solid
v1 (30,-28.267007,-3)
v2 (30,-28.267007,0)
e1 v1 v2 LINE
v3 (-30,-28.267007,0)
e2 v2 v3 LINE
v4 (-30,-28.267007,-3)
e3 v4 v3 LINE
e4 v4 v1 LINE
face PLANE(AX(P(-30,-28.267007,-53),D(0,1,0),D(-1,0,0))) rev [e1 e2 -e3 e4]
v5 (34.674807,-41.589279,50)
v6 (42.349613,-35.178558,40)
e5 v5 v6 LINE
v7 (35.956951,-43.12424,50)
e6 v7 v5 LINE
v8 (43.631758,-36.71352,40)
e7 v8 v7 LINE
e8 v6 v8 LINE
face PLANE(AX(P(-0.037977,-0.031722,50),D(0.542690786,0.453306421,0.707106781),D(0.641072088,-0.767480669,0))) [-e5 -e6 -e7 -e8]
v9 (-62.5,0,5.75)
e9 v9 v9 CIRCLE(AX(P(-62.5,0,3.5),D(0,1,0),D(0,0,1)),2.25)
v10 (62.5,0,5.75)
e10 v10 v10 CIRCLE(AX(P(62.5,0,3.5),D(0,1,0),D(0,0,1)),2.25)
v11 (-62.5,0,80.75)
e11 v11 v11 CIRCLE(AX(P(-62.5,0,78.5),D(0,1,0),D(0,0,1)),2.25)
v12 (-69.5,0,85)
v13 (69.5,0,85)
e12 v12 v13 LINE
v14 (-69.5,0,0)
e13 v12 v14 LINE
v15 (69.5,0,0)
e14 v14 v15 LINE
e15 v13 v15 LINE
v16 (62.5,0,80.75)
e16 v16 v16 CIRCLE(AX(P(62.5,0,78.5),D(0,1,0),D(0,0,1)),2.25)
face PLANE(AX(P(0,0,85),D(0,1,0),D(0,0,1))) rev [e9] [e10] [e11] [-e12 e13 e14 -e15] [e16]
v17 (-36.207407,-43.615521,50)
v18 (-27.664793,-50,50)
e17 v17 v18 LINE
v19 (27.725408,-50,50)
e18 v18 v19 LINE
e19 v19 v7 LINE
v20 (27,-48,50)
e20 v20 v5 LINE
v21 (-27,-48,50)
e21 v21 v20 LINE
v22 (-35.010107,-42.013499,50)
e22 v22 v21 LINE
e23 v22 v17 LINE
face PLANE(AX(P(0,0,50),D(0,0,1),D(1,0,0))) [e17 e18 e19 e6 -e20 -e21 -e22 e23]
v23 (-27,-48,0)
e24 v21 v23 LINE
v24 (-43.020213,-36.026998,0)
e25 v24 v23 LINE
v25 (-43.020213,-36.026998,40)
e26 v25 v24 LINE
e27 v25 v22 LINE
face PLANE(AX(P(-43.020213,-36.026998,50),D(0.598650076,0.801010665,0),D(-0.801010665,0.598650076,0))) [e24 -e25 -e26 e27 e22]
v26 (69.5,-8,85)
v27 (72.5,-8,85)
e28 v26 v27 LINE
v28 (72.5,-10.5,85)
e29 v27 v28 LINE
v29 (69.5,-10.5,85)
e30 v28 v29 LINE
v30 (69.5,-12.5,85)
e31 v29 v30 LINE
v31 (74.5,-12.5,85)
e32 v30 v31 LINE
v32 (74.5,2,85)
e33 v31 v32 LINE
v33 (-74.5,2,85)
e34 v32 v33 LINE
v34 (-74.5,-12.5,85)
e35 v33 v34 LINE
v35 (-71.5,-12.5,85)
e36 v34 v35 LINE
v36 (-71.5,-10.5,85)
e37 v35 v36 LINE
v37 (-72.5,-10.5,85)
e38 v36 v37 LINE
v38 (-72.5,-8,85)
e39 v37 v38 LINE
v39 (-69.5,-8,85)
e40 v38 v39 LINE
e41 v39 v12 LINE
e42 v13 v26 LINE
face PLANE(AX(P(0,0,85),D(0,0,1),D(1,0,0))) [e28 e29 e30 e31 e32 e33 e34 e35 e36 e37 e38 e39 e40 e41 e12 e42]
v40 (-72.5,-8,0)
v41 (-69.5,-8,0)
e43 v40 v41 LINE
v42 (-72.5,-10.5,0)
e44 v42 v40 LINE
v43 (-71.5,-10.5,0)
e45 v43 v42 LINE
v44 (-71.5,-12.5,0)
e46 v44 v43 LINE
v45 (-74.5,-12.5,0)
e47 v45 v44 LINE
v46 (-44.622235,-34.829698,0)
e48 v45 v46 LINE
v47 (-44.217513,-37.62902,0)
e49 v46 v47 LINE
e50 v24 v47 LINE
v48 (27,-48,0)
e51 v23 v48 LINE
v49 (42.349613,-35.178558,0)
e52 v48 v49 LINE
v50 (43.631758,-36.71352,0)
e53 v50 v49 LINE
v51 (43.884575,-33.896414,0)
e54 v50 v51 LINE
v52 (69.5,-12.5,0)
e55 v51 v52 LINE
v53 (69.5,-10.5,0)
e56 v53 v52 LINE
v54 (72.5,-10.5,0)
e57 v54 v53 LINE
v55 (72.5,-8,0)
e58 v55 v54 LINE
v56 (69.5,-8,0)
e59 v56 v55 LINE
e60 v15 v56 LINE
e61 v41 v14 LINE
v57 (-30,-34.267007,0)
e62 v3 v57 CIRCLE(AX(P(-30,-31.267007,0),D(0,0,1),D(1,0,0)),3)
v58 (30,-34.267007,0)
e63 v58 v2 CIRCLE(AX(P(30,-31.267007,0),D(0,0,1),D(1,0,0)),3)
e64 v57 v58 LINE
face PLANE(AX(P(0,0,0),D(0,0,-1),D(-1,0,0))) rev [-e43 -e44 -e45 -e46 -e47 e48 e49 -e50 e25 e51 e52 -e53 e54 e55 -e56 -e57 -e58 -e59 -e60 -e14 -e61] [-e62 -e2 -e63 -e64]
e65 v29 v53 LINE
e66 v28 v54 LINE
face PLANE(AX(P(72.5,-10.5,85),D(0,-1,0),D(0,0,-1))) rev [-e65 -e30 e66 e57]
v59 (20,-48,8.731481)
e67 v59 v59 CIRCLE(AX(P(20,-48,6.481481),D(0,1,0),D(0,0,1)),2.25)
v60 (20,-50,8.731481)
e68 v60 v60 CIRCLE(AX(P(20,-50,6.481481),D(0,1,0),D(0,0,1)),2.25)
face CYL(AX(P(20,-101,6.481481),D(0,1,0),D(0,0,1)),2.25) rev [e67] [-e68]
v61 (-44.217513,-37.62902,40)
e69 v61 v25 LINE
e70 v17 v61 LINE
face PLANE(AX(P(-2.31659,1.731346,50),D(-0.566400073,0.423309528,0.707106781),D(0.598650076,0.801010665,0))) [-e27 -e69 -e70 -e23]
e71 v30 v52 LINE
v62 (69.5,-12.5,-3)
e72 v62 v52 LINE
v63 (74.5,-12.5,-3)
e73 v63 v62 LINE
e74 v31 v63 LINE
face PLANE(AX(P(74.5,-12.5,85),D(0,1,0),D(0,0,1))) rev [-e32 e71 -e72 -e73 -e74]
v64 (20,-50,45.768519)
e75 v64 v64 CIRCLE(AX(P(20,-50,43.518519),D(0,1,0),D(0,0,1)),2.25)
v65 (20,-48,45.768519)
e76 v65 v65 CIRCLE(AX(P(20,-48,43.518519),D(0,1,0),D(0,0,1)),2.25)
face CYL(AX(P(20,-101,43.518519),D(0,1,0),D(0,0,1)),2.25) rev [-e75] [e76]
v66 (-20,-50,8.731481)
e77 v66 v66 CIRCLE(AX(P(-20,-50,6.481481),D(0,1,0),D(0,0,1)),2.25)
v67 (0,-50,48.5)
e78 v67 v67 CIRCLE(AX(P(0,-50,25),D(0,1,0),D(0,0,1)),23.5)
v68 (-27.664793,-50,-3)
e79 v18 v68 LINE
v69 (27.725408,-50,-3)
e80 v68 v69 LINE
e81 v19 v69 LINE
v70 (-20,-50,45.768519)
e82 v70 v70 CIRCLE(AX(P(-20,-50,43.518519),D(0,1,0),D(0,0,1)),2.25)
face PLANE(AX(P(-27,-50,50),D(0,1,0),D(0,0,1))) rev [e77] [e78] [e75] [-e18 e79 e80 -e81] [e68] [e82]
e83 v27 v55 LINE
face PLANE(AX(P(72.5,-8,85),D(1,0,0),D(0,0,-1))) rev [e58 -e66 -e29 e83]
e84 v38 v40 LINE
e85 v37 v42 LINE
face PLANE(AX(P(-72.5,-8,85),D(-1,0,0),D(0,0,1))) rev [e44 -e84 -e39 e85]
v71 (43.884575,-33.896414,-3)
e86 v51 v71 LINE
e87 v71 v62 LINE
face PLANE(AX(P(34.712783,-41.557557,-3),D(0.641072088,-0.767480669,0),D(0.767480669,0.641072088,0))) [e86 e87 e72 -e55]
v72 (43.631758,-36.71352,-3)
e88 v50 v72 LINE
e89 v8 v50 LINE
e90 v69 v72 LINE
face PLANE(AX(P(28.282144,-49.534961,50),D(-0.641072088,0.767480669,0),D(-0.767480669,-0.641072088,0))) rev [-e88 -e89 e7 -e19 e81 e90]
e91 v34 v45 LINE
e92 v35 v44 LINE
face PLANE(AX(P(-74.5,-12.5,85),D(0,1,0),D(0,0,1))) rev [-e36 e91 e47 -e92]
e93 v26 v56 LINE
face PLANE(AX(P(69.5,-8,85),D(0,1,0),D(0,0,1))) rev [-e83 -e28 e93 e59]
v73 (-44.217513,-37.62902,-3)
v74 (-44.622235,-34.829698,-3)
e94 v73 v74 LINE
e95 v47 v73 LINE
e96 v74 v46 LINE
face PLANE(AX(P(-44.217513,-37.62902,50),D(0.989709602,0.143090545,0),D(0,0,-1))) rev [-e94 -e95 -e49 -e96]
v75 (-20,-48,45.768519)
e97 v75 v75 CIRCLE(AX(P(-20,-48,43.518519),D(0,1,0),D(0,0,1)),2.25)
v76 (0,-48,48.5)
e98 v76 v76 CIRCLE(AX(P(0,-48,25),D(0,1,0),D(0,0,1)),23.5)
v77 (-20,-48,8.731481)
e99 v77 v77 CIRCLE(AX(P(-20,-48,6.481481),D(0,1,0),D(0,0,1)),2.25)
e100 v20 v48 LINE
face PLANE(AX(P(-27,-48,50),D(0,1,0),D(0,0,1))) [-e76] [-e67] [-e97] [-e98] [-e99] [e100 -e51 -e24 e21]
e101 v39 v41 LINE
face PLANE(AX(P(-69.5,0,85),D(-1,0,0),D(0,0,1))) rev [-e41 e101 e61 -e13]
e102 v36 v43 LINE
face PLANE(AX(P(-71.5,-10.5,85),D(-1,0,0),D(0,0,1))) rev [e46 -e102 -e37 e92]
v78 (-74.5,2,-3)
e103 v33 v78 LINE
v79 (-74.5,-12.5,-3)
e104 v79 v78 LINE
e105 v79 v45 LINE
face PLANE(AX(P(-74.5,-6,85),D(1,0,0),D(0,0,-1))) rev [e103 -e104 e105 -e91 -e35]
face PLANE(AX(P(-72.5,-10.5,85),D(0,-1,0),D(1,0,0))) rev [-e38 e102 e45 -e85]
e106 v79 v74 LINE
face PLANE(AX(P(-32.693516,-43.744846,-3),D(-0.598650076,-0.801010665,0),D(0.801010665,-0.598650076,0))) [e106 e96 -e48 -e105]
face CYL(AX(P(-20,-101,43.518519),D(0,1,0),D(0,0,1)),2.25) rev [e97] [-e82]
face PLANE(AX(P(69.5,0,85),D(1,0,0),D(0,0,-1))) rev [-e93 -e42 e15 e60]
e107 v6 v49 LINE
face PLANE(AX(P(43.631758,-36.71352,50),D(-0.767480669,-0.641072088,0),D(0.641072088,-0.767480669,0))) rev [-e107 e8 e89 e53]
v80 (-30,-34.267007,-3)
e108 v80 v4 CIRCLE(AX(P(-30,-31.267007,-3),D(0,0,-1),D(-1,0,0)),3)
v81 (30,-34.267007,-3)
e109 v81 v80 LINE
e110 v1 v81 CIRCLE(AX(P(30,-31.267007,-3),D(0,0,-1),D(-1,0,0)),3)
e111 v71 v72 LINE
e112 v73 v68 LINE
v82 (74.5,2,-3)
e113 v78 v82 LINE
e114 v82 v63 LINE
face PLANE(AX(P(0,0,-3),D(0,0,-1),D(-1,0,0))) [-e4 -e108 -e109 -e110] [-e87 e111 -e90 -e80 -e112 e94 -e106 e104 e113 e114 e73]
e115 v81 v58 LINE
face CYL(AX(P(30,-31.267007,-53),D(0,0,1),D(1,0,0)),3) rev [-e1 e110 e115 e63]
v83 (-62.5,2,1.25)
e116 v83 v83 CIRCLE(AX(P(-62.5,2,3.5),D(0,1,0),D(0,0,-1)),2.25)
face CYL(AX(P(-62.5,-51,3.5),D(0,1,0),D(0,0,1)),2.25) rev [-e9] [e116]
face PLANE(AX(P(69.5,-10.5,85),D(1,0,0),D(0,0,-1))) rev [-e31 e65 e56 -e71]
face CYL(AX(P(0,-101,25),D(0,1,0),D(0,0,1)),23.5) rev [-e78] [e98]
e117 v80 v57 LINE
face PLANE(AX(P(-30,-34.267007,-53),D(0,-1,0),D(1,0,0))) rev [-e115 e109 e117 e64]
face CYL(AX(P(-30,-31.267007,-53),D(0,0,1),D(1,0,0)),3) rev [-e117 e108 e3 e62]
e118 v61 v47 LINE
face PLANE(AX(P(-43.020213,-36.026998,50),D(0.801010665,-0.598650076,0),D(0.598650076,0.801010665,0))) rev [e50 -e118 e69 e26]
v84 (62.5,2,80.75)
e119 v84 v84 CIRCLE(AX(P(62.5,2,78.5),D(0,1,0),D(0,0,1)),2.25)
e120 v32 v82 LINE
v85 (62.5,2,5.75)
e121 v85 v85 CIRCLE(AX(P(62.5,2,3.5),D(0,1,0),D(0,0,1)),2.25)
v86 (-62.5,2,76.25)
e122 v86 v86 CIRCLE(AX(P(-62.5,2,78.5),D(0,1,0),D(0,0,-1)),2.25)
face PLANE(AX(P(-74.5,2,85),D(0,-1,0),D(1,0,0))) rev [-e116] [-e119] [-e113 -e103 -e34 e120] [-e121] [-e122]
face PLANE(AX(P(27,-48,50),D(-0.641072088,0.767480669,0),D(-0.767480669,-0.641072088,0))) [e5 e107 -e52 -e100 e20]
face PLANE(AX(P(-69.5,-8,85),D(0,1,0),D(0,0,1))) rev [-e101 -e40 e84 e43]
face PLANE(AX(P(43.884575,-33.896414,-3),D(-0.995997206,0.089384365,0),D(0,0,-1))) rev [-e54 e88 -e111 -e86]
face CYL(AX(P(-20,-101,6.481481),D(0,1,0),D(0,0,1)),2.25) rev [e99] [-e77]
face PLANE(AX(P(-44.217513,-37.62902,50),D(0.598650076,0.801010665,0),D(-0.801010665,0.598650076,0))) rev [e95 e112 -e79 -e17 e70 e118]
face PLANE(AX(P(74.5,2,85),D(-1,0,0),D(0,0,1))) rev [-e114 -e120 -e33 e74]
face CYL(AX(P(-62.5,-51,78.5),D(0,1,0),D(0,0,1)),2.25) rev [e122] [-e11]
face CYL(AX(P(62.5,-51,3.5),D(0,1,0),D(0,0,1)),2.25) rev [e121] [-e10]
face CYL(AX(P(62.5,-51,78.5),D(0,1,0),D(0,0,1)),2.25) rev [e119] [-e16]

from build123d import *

# Parameters (mm, degrees)
BOSS_EXTRUDE1_DEPTH = 85
BOSS_EXTRUDE2_DEPTH = 3
EXTRUDE_THIN1_DEPTH = 53
CHAMFER1_SIZE       = 10
CHAMFER2_SIZE       = 2
CUT_EXTRUDE1_DEPTH  = 53
SKETCH6_R           = 23.5
SKETCH6_R_2         = 2.25
CUT_EXTRUDE2_DEPTH  = 53
SKETCH7_R           = 2.25
CUT_EXTRUDE3_DEPTH  = 53


with BuildPart() as part:
    # Sketch1 → Boss-Extrude1 (new body)
    with BuildSketch(Plane.XY):
        Polygon((0, 0), (69.5, 0), (69.5, -8), (72.5, -8), (72.5, -10.5), (69.5, -10.5), (69.5, -12.5), (74.5, -12.5), (74.5, -6), (74.5, 2), (71.5, 2), (0, 2), (-71.5, 2), (-74.5, 2), (-74.5, -6), (-74.5, -12.5), (-71.5, -12.5), (-71.5, -10.5), (-72.5, -10.5), (-72.5, -8), (-69.5, -8), (-69.5, 0), align=None)
    extrude(amount=BOSS_EXTRUDE1_DEPTH)

    # Sketch2 → Boss-Extrude2 (add)
    with BuildSketch(Plane(origin=(0, 0, 0), x_dir=(-1, 0, 0), z_dir=(0, 0, -1))):
        Polygon((-27, -48), (27, -48), (74.5, -12.5), (74.5, 2), (-74.5, 2), (-74.5, -12.5), (-69.5, -12.5), align=None)
    extrude(amount=BOSS_EXTRUDE2_DEPTH)

    # Sketch4 → Extrude-Thin1 (add)
    with BuildSketch(Plane(origin=(0, 0, -3), x_dir=(-1, 0, 0), z_dir=(0, 0, -1))):
        Polygon((43.020213309, -36.026998474), (27, -48), (-27, -48), (-42.349613383, -35.178558233), (-43.63175756, -36.713519571), (-27.725407751, -50), (27.664793483, -50), (44.217513462, -37.629019805), align=None)
    extrude(amount=-EXTRUDE_THIN1_DEPTH)

    # Chamfer1
    chamfer1_edges = [part.edges().sort_by_distance(p)[0] for p in [
        (-43.618863385, -36.82800914, 50),
        (42.990685472, -35.946038902, 50),
    ]]
    chamfer(chamfer1_edges, length=CHAMFER1_SIZE)

    # Chamfer2
    chamfer2_edges = [part.edges().sort_by_distance(p)[0] for p in [
        (-43.020213309, -36.026998474, -1.5),
        (42.349613383, -35.178558233, -1.5),
    ]]
    chamfer(chamfer2_edges, length=CHAMFER2_SIZE - 0.0001)  # a hair under: the kernel refuses the full size

    # Sketch5 → Cut-Extrude1 (cut)
    with BuildSketch(Plane.XY):
        with BuildLine():
            Line((-30, -28.267007474), (30, -28.267007474))
            ThreePointArc((30, -28.267007474), (33, -31.267007474), (30, -34.267007474))
            Line((30, -34.267007474), (-30, -34.267007474))
            ThreePointArc((-30, -34.267007474), (-33, -31.267007474), (-30, -28.267007474))
        make_face()
    extrude(amount=-CUT_EXTRUDE1_DEPTH, mode=Mode.SUBTRACT)

    # Sketch6 → Cut-Extrude2 (cut)
    with BuildSketch(Plane(origin=(0, -48, 0), x_dir=(1, 0, 0), z_dir=(0, 1, 0))):
        with Locations(Location((0, -25, 0), (0, 0, 270))):
            Circle(SKETCH6_R)
        with Locations(Location((20, -43.518518519, 0), (0, 0, 270))):
            Circle(SKETCH6_R_2)
        with Locations(Location((-20, -43.518518519, 0), (0, 0, 270))):
            Circle(SKETCH6_R_2)
        with Locations(Location((-20, -6.481481481, 0), (0, 0, 270))):
            Circle(SKETCH6_R_2)
        with Locations(Location((20, -6.481481481, 0), (0, 0, 270))):
            Circle(SKETCH6_R_2)
    extrude(amount=-CUT_EXTRUDE2_DEPTH, mode=Mode.SUBTRACT)

    # Sketch7 → Cut-Extrude3 (cut)
    with BuildSketch(Plane(origin=(0, 2, 0), x_dir=(1, 0, 0), z_dir=(0, 1, 0))):
        with Locations(Location((62.5, -78.5, 0), (0, 0, 270))):
            Circle(SKETCH7_R)
        with Locations(Location((62.5, -3.5, 0), (0, 0, 270))):
            Circle(SKETCH7_R)
        with Locations(Location((-62.5, -3.5, 0), (0, 0, 270))):
            Circle(SKETCH7_R)
        with Locations(Location((-62.5, -78.5, 0), (0, 0, 270))):
            Circle(SKETCH7_R)
    extrude(amount=-CUT_EXTRUDE3_DEPTH, mode=Mode.SUBTRACT)


solid = part.part
